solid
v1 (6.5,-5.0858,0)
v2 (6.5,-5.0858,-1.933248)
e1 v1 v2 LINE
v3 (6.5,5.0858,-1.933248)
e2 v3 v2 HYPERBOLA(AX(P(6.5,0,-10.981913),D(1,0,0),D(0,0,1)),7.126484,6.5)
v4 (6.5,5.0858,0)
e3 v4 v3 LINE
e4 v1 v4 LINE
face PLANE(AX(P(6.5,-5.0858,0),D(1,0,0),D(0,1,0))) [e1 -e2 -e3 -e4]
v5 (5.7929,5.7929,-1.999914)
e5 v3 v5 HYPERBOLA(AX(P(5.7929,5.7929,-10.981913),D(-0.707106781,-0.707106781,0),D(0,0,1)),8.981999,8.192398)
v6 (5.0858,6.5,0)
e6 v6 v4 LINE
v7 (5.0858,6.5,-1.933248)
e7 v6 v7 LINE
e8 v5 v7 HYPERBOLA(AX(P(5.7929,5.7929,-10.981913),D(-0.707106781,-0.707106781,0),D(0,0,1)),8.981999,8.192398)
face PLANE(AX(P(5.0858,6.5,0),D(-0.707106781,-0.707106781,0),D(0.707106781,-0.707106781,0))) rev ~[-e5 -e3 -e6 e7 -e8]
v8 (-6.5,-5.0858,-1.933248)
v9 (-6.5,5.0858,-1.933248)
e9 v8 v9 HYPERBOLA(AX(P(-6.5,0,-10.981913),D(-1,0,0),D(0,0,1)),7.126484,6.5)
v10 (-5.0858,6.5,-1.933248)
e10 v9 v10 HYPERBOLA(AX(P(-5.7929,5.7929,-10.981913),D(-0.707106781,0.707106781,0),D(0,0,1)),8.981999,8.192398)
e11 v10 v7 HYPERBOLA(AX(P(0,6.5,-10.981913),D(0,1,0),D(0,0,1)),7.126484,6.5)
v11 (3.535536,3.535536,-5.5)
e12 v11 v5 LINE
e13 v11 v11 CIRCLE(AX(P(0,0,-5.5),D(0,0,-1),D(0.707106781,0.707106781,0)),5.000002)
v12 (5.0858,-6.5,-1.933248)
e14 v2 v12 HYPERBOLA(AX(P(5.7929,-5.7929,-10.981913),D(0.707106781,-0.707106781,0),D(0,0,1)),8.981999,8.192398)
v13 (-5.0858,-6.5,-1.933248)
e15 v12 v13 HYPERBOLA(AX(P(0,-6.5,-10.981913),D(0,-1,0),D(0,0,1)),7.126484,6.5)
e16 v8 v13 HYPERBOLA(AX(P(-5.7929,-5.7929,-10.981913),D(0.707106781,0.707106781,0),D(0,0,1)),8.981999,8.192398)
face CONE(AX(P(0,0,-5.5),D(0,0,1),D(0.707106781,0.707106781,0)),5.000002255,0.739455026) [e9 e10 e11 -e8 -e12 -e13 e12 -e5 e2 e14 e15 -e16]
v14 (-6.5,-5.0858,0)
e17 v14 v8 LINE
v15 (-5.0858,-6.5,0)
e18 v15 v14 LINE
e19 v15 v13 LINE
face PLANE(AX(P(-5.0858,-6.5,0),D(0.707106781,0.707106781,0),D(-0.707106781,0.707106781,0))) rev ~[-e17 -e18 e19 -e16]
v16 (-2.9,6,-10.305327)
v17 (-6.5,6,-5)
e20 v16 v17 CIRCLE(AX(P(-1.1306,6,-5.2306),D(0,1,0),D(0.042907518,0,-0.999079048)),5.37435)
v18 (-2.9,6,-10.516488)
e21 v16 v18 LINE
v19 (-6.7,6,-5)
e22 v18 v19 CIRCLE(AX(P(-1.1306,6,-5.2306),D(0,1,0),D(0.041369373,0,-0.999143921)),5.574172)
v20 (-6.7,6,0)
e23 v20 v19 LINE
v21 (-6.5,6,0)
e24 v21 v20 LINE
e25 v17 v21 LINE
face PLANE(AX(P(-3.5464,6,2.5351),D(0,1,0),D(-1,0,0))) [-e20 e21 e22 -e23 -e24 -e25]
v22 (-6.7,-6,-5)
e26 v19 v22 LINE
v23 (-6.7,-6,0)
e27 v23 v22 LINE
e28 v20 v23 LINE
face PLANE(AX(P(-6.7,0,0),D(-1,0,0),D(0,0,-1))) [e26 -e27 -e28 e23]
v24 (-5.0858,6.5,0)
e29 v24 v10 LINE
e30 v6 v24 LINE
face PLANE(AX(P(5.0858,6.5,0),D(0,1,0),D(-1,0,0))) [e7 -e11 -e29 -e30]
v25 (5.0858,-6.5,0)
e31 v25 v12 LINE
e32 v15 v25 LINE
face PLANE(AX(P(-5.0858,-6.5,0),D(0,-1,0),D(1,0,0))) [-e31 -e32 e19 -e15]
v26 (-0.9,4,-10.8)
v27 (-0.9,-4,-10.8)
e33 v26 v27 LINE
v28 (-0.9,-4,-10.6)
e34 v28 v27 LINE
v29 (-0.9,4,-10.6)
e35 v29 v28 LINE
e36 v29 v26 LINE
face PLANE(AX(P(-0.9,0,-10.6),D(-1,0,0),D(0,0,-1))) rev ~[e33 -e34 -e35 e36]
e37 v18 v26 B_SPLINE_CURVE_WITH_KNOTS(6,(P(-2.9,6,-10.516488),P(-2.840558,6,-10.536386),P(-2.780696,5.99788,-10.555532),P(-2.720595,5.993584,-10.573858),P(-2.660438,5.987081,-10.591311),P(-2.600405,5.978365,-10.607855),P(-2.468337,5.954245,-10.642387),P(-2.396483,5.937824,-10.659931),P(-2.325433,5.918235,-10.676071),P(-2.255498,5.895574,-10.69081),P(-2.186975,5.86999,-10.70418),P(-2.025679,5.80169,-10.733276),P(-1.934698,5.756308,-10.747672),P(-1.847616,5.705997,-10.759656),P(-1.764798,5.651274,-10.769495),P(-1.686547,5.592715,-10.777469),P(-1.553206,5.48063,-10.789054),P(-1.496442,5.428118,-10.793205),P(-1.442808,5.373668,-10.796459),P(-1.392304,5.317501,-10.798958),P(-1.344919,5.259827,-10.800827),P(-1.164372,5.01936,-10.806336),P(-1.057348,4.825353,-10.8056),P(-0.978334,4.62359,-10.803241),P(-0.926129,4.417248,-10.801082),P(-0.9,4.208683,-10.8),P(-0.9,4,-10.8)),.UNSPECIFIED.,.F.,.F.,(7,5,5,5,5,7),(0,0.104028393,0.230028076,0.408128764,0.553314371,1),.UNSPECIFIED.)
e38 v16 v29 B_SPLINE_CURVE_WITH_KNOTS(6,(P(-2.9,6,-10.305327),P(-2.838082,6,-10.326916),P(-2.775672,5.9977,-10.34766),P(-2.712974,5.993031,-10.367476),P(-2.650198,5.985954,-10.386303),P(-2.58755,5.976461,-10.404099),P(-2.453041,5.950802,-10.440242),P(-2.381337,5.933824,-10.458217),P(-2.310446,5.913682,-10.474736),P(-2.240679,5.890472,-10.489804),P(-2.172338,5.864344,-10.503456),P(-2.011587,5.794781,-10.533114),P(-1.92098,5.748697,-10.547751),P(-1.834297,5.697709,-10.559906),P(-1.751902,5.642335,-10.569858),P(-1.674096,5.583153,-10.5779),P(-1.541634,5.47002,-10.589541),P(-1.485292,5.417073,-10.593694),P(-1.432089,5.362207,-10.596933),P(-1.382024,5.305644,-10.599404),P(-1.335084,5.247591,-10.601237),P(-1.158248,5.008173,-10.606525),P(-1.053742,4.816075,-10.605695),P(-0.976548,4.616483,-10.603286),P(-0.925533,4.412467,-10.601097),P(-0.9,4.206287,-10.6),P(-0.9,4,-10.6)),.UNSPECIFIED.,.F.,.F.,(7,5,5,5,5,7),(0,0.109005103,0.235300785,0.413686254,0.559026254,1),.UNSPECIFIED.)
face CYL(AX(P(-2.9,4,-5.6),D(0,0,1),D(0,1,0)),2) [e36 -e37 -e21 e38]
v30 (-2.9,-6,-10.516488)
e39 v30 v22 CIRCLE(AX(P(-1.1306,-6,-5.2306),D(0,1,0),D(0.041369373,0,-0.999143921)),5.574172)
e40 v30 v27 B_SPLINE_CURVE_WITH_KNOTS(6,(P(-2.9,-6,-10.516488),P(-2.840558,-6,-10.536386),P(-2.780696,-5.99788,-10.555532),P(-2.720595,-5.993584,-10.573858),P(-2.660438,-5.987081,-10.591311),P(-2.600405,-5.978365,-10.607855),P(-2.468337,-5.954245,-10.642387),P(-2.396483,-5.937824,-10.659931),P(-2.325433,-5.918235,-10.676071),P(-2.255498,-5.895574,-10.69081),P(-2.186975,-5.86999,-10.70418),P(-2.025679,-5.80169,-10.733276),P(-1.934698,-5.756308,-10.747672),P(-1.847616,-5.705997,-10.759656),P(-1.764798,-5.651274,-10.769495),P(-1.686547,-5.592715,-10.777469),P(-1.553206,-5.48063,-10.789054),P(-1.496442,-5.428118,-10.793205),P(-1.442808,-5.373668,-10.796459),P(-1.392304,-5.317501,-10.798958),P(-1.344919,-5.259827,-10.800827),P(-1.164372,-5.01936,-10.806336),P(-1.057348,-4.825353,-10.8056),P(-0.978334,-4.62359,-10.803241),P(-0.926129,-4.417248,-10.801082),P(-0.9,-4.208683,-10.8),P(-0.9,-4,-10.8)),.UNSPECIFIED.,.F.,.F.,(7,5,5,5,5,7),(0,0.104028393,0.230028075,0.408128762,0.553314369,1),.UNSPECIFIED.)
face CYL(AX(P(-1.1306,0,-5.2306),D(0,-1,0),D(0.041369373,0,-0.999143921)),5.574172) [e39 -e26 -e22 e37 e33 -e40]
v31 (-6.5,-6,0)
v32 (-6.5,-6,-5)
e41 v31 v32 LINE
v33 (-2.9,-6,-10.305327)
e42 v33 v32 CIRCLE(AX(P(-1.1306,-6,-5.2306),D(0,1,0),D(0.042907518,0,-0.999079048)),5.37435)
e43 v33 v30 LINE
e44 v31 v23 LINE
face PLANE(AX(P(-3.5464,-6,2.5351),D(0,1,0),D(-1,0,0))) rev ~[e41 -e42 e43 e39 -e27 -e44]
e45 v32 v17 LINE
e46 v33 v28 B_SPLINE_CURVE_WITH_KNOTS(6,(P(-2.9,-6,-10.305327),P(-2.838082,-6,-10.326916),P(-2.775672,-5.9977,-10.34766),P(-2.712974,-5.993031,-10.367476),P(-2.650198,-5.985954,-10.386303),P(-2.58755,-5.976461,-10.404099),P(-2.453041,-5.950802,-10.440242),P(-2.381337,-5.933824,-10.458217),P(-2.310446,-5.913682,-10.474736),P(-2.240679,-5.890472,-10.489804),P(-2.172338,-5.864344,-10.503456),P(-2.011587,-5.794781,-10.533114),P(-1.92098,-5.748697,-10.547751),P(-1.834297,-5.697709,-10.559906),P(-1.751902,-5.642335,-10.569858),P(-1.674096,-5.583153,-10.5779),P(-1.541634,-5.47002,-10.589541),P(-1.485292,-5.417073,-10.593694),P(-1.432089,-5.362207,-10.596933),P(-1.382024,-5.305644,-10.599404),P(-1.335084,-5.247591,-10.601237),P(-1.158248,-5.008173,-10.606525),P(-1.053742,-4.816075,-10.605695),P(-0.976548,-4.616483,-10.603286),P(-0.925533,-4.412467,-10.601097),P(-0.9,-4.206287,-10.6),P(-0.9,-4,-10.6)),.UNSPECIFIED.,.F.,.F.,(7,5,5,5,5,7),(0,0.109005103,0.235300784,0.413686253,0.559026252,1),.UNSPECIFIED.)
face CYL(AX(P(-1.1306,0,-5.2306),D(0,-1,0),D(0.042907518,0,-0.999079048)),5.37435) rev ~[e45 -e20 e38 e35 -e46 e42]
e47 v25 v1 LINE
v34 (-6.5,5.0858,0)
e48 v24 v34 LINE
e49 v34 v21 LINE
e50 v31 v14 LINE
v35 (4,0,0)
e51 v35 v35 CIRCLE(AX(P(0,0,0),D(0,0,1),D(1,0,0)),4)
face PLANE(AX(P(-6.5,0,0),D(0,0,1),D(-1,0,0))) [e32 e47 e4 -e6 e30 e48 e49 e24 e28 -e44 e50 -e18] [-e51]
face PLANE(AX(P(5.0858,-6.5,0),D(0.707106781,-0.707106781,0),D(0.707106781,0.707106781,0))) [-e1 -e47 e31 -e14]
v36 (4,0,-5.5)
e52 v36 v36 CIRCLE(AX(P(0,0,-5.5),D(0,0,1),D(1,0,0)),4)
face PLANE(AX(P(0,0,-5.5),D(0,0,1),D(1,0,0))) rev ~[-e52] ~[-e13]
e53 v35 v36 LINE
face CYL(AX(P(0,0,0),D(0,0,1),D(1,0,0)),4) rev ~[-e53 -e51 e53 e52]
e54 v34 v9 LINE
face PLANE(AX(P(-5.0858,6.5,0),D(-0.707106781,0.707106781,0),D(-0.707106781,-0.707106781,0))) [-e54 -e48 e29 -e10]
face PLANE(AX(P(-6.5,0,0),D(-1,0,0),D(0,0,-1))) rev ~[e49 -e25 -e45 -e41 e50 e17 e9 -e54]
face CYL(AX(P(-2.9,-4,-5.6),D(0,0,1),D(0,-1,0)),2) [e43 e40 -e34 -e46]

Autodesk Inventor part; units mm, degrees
ref_plane "YZ Plane" through (0, 0, 0) normal (1, 0, 0) x (0, 1, 0)
ref_plane "XZ Plane" through (0, 0, 0) normal (0, 1, 0) x (-1, 0, 0)
sketch "Sketch2" plane through (0, 0, 0) normal (0, 0, 1) x (1, 0, 0)
  line L0 (-5.0858, -6.5) -> (5.0858, -6.5)
  line L1 (6.5, -5.0858) -> (6.5, 5.0858)
  line L2 (5.0858, 6.5) -> (-5.0858, 6.5)
  line L3 (-6.5, 5.0858) -> (-6.5, -5.0858)
  line L4 (-6.5, 6.5) -> (6.5, -6.5) construction
  circle A0 centre (0, 0) radius 4
  line L5 (5.0858, 6.5) -> (6.5, 5.0858)
  line L6 (0, -6.5) -> (0, 6.5) construction
  line L7 (-6.5, 0) -> (6.5, 0) construction
  line L8 (-5.0858, 6.5) -> (-6.5, 5.0858)
  line L9 (5.0858, -6.5) -> (6.5, -5.0858)
  line L10 (-5.0858, -6.5) -> (-6.5, -5.0858)
  dimension "THREAD" = 8
  dimension "d3" = 45
  dimension "d4" = 2
extrude "Extrusion1" add sketch "Sketch2" against normal blind 5.5
ref_plane "Work Plane1" through (-5.7929, -5.7929, -5.5) normal (0.7071068, -0.7071068, 0) x (0.7071068, 0.7071068, 0)
sketch "Sketch4" plane through (-5.7929, -5.7929, -5.5) normal (0.7071068, -0.7071068, 0) x (0.7071068, 0.7071068, 0)
  line L0 (12.1924, 0) -> (4.1924, 0) projected
  line L1 (8.1924, 0) -> (13.1924, 0)
  line L2 (16.3848, 5.5) -> (16.3848, 3.5)
  line L3 (13.1924, 0) -> (16.7968, 3.9518)
  line L4 (13.1924, 0) -> (16.3848, 0)
  line L5 (16.3848, 3.5) -> (16.3848, 0)
  line L6 (16.7968, 3.9518) -> (16.7968, -0.4121)
  line L7 (16.7968, -0.4121) -> (13.1924, -0.4121)
  line L8 (13.1924, -0.4121) -> (13.1924, 0)
  line L9 (8.1924, 5.5) -> (8.1924, 0)
  line L10 (16.3848, 5.5) -> (16.3848, 0) projected
  line L11 (16.3848, 3.5) -> (17.5015, 3.5) construction
  line L12 (9.1924, 5.5) -> (16.3848, 5.5) construction
  dimension "d10" = 5
  dimension "d15" = 2
revolve "Revolution1" cut sketch "Sketch4" angle 360 about axis through (0, 0, 0) along (0, 0, -1)
thread "Thread1" size "M8x1.25" class "6H" standard "ANSI Metric M Profile" full length
sketch "Sketch6" plane through (-3.5464, 0, 2.5351) normal (0, 1, 0) x (-1, 0, 0)
  line L0 (2.9536, -2.5351) -> (2.9536, 6.0056)
  line L1 (2.9536, -2.5351) -> (2.9536, -7.5351)
  arc A0 (-2.6464, -13.1351) -> (2.9536, -7.5351) centre (-2.4158, -7.7657) ccw
  line L2 (2.9536, -2.5351) -> (3.1536, -2.5351)
  line L3 (3.1536, -2.5351) -> (3.1536, -7.5351)
  line L4 (-2.6464, -13.1351) -> (-2.6464, -13.3351)
  arc A1 (-2.6464, -13.3351) -> (3.1536, -7.5351) centre (-2.4158, -7.7657) ccw
  line L5 (2.9536, 0) -> (2.9536, -1.9333)
  line L6 (-5.0858, -2.5351) -> (5.0858, -2.5351)
  line L7 (-8.6322, -2.5351) -> (1.5394, -2.5351) projected
  line L8 (2.9536, -2.5351) -> (2.9536, -4.4684) projected
  point P0 (0, 0)
  point P1 (-15.0649, 7.0019)
  dimension "d25" = 5
  dimension "d23" = 0.2
  dimension "d22" = 0.2
  dimension "d21" = 10.8
  dimension "d24" = 5.3743
extrude "Extrusion3" add sketch "Sketch6" along normal mid plane 12
fillet "Fillet2" radius 2 2 edges at (-0.9, -6, -10.7) (-0.9, 6, -10.7)
properties part number "21.1351/2" material "Steel, Mild"
